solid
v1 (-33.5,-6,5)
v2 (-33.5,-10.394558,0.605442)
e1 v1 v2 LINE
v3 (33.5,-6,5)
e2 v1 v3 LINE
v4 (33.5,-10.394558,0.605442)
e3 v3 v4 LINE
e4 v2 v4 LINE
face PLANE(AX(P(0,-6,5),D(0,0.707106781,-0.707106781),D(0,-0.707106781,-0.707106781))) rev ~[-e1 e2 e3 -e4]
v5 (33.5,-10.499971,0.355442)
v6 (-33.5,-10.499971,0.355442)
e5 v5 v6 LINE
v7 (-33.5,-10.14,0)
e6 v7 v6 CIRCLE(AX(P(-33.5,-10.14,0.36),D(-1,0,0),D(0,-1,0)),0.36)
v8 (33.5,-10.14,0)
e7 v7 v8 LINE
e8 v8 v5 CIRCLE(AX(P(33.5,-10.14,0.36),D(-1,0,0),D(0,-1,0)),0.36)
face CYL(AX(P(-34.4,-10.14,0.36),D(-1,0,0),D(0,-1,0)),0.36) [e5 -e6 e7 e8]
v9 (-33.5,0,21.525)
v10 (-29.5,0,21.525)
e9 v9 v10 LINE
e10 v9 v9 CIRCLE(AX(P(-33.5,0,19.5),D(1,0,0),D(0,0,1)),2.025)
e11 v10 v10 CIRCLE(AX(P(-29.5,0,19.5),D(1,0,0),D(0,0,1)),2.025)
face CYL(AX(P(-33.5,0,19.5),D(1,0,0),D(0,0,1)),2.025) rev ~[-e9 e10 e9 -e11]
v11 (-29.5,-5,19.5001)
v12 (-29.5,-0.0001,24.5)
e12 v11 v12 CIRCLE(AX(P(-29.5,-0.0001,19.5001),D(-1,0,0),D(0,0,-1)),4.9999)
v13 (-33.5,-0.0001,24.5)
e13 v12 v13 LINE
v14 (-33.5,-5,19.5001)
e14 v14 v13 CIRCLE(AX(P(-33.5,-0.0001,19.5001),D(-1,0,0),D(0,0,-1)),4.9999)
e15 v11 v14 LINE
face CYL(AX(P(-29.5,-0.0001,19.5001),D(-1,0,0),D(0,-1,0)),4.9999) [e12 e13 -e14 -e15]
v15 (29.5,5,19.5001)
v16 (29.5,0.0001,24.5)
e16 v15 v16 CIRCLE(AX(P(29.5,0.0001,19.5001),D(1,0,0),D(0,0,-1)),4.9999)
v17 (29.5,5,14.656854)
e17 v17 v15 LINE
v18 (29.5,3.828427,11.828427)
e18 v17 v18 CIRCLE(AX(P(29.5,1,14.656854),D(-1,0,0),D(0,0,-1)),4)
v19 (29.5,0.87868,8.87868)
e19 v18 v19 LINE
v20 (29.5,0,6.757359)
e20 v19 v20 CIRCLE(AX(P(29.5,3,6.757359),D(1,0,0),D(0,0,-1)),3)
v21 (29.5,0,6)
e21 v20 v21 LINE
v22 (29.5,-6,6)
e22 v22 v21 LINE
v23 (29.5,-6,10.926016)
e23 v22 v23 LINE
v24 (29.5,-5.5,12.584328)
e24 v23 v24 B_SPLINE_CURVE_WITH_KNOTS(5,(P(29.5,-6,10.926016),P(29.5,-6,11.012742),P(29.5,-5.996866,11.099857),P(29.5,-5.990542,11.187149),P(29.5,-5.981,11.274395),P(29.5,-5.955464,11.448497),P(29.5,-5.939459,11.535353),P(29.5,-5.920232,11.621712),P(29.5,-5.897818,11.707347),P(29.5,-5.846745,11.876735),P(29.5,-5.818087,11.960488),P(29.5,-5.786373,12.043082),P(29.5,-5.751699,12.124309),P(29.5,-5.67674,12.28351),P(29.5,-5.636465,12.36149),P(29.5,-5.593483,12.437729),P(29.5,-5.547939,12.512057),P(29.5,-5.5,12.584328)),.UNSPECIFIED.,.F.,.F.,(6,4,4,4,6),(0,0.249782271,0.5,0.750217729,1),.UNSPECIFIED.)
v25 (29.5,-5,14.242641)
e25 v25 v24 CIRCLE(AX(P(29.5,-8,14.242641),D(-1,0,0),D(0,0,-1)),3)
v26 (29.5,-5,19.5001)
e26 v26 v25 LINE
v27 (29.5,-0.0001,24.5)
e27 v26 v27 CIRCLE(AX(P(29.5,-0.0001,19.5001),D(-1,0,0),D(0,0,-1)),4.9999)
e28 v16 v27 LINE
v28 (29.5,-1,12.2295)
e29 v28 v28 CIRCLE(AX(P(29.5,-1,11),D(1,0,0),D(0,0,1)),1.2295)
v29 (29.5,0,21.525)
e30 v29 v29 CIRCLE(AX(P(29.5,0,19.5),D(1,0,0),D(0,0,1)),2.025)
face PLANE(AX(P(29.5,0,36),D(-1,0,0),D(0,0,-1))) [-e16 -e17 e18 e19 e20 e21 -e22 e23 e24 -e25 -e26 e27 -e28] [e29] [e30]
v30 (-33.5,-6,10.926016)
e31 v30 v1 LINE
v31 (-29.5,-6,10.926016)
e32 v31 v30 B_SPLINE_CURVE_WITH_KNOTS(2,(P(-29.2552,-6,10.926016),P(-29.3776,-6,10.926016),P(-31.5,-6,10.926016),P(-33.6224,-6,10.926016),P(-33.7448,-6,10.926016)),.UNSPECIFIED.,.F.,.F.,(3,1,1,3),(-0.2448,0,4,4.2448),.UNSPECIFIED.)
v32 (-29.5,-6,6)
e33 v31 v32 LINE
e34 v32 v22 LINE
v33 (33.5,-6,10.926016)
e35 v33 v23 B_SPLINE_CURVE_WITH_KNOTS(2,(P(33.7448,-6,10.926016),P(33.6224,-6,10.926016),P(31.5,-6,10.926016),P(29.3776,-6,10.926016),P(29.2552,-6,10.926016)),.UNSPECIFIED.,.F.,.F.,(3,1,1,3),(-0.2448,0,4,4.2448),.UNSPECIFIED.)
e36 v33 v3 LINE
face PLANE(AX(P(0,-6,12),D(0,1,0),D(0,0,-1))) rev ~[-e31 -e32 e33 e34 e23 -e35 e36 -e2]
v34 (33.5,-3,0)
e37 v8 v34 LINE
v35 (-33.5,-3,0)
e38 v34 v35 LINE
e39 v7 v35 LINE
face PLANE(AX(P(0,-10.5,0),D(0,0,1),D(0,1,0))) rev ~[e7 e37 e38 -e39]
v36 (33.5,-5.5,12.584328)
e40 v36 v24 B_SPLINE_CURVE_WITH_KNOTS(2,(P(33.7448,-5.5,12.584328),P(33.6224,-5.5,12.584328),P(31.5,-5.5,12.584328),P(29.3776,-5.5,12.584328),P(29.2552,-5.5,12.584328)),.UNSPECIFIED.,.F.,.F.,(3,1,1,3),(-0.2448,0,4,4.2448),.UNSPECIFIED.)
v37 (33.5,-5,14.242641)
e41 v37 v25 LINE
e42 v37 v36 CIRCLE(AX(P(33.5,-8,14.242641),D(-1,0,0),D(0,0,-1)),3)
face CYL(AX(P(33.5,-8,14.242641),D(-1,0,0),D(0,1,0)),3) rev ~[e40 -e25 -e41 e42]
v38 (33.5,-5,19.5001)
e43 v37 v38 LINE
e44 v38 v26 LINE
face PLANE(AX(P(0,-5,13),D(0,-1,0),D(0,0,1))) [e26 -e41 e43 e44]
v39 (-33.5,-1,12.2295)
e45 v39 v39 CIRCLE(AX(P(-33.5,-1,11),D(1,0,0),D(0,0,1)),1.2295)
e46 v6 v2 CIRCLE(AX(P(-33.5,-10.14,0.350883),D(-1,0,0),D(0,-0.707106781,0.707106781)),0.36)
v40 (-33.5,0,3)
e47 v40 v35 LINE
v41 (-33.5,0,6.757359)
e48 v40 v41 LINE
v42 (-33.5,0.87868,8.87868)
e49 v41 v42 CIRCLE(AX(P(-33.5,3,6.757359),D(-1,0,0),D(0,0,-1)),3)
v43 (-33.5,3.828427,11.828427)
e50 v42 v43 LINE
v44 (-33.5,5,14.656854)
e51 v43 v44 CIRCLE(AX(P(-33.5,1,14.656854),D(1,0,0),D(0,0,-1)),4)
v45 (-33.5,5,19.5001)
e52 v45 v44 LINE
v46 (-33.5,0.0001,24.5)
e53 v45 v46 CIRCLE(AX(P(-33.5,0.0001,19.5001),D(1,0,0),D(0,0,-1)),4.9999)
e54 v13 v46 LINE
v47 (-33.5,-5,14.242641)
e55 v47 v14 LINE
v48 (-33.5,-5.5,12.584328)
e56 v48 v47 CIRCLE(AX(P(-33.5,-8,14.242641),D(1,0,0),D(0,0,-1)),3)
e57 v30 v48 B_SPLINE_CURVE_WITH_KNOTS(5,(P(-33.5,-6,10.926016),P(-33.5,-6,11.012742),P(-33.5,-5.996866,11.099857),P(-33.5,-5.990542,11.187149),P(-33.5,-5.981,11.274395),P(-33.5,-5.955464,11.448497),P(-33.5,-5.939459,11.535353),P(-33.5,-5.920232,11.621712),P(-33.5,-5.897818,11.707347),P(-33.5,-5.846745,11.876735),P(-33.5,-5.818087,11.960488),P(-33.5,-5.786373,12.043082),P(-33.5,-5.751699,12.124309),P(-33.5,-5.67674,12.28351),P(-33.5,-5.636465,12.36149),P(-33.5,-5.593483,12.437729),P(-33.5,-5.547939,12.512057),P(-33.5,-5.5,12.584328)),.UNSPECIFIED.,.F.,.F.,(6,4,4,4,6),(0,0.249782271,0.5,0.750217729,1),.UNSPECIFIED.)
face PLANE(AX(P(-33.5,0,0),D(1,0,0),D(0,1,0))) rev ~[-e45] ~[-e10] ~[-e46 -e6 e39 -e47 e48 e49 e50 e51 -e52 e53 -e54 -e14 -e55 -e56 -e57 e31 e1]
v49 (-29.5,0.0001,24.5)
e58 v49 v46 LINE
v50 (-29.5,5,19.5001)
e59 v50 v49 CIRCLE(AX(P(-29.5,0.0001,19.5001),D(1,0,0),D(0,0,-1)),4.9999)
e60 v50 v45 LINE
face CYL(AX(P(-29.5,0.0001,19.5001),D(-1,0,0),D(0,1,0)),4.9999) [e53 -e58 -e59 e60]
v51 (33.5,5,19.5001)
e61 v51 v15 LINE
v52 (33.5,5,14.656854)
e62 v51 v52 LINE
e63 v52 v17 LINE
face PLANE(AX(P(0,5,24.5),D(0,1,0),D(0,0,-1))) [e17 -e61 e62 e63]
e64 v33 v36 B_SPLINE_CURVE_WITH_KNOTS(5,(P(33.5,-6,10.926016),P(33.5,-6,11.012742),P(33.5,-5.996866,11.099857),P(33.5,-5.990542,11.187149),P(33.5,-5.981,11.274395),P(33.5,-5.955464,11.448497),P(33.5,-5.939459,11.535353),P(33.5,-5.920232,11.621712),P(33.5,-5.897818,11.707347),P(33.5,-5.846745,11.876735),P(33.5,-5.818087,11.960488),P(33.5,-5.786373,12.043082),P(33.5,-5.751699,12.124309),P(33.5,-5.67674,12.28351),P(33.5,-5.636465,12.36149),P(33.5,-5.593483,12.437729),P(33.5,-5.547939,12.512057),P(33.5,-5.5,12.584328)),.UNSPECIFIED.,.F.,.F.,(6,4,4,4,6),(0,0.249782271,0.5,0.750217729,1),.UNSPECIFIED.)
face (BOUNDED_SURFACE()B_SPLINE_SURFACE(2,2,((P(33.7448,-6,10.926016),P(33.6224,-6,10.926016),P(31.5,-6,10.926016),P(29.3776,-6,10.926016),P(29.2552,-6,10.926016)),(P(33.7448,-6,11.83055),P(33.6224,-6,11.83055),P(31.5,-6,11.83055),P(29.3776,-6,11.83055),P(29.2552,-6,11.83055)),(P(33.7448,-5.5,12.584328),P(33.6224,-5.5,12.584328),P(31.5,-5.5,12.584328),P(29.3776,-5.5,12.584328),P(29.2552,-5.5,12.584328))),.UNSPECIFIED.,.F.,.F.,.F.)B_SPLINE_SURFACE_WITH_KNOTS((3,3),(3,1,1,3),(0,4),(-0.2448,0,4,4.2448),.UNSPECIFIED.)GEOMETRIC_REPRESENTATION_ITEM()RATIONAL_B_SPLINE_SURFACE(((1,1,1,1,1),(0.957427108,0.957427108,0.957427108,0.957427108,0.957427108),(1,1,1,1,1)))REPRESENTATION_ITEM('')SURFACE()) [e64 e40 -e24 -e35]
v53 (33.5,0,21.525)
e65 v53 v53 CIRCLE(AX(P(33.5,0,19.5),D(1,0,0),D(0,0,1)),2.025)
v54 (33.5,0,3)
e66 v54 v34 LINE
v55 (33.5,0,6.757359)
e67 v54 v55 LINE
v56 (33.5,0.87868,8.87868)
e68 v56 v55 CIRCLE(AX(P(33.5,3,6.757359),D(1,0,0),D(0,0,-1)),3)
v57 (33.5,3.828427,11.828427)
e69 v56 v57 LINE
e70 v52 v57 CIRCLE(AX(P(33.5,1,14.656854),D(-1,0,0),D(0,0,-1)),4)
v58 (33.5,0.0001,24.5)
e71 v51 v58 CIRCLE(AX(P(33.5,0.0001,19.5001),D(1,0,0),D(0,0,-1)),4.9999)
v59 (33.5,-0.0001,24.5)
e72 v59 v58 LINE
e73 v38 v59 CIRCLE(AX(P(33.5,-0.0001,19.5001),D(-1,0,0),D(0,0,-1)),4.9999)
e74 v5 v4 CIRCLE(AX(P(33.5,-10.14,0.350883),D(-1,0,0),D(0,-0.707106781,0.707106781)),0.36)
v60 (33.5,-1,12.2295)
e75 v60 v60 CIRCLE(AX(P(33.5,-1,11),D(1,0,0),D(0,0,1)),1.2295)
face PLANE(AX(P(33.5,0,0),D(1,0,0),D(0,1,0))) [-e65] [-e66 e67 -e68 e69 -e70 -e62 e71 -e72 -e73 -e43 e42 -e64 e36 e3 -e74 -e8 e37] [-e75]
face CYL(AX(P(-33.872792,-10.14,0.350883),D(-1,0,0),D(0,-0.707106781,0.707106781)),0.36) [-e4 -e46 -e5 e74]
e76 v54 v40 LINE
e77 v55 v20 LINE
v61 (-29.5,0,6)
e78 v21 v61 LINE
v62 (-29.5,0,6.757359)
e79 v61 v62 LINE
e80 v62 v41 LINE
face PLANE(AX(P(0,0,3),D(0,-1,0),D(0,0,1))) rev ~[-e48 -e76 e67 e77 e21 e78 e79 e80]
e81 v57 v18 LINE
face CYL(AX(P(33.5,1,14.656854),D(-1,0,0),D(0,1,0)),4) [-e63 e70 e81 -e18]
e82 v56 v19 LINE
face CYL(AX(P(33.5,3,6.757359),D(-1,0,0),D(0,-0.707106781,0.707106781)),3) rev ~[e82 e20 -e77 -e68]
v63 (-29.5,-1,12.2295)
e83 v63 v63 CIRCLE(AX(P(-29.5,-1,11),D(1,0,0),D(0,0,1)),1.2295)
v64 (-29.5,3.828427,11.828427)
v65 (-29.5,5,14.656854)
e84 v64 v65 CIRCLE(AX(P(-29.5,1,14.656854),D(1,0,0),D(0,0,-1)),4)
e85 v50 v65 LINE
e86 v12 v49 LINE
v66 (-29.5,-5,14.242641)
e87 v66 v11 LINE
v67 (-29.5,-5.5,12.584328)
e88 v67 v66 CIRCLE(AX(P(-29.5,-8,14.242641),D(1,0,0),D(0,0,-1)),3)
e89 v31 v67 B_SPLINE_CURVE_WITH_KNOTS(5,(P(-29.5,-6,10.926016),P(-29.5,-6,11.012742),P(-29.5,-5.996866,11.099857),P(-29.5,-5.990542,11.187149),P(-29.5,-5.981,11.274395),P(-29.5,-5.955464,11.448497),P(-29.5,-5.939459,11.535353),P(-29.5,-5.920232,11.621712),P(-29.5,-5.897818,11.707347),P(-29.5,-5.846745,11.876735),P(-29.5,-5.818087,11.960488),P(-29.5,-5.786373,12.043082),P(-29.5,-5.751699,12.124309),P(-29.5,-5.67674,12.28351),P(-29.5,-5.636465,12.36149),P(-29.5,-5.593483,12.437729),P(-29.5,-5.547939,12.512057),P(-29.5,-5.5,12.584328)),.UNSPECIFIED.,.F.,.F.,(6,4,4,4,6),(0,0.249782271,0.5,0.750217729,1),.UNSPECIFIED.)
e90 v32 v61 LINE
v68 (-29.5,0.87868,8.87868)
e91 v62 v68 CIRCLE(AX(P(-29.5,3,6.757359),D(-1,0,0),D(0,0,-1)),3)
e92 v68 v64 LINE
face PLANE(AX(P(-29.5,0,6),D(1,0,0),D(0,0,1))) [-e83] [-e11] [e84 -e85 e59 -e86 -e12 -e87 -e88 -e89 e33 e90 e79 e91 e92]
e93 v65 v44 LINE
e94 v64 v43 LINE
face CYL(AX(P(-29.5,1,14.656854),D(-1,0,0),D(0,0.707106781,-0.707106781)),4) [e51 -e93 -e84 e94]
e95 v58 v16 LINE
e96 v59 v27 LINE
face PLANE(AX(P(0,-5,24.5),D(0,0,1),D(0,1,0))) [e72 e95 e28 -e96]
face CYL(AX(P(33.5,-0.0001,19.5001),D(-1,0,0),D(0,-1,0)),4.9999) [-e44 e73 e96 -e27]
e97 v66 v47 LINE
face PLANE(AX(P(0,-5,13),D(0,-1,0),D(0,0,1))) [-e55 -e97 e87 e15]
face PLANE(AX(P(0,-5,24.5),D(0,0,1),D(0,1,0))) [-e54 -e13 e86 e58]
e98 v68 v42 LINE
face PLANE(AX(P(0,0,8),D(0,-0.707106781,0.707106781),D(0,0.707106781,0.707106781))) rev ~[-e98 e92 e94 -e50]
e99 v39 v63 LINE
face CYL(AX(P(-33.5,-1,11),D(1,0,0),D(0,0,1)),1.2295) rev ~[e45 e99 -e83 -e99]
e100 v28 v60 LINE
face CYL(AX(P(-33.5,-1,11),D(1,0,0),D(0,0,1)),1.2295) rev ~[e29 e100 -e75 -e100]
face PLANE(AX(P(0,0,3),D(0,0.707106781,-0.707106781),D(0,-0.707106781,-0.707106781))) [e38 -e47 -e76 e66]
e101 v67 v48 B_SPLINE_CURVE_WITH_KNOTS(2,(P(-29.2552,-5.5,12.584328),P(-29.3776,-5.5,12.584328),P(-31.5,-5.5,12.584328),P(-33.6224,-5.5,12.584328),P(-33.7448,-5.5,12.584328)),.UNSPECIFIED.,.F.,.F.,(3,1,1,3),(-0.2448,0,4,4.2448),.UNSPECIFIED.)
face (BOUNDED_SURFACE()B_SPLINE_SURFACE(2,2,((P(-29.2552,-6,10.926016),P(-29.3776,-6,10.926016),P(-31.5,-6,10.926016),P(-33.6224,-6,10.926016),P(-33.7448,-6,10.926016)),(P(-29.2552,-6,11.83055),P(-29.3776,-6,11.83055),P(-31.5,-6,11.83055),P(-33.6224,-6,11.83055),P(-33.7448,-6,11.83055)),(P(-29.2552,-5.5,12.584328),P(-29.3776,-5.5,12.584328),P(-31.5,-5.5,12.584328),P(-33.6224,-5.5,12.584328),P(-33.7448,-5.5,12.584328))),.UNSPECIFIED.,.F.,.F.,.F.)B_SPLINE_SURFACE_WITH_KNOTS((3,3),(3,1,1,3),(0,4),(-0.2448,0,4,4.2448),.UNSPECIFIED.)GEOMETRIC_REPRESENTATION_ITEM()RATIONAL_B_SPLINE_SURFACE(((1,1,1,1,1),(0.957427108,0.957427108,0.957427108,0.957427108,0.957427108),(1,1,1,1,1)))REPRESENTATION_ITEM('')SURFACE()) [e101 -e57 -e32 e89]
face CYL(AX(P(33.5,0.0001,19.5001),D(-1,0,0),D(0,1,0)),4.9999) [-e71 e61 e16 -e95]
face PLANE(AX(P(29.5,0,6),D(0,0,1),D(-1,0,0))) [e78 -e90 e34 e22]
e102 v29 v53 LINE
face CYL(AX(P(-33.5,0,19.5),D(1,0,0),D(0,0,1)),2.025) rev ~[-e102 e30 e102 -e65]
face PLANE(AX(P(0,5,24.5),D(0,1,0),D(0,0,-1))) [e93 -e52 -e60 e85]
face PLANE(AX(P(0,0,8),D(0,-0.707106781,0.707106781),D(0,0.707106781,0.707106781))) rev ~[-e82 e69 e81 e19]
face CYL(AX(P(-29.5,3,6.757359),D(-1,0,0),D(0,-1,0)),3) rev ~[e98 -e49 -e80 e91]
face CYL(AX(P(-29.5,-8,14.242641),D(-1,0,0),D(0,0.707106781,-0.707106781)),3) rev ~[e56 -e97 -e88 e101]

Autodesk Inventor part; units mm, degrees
ref_plane "YZ Plane" through (0, 0, 0) normal (1, 0, 0) x (0, 1, 0)
ref_plane "XZ Plane" through (0, 0, 0) normal (0, 1, 0) x (-1, 0, 0)
ref_plane "XY Plane" through (0, 0, 0) normal (0, 0, 1) x (1, 0, 0)
sketch "Skizze1" plane through (0, 0, 0) normal (1, 0, 0) x (0, 1, 0)
  line L0 (-6, 5) -> (-10.5, 0.5)
  line L1 (-10.5, 0) -> (-3, 0)
  line L2 (0, 3) -> (0, 8)
  line L3 (-10.5, 0.5) -> (-10.5, 0)
  line L4 (0, 8) -> (5, 13)
  line L5 (0, 8) -> (0, 19.5) construction
  circle A0 centre (0, 19.5) radius 0.5
  line L6 (-5, 13) -> (-5, 24.5)
  line L7 (-5, 24.5) -> (5, 24.5)
  line L8 (5, 24.5) -> (5, 13)
  line L9 (0, 3) -> (-3, 0)
  line L10 (-5, 13) -> (-6, 12)
  line L11 (-6, 12) -> (-6, 5)
  line L12 (5, 13) -> (-5, 13) construction
  point P0 (0, 0)
  dimension "d40" = 0.5
  dimension "d41" = 10.5
  dimension "d44" = 1
  dimension "d56" = 5
  dimension "d58" = 19.5
  dimension "d59" = 10
  dimension "d60" = 45
  dimension "d61" = 8
  dimension "d62" = 3
  dimension "d63" = 45
  dimension "d67" = 1
extrude "Extrusion1" add sketch "Skizze1" along normal mid plane 67
sketch "Skizze6" plane through (0, 0, 0) normal (0, 1, 0) x (-1, 0, 0)
  line L0 (33.5, 0.5) -> (-33.5, 0.5) projected
  line L1 (-33.5, 5) -> (-33.5, 0.5) projected
  line L2 (33.5, 0.5) -> (33.5, 5) projected
  line L3 (-29.5, 6) -> (29.5, 6)
  line L4 (29.5, 6) -> (29.5, 36)
  line L5 (29.5, 36) -> (-29.5, 36)
  line L6 (-29.5, 36) -> (-29.5, 6)
  line L7 (0, -7.1) -> (0, 42.6) projected
  line L8 (33.5, 0) -> (-33.5, 0) projected
  line L9 (-33.5, 0) -> (33.5, 0) projected
  point P0 (0, 0)
  point P1 (-33, 10)
  point P2 (33, 10)
  dimension "d45" = 4
  dimension "d46" = 30
  dimension "d50" = 6
extrude "Extrusion4" cut sketch "Skizze6" along normal through all both and the other way through all
sketch "Skizze3" plane through (-33.5, 0, 0) normal (-1, 0, 0) x (0, 0, 1)
  line L0 (8, 0) -> (3, 0) projected
  line L1 (0, -3) -> (0, -10.5) projected
  line L2 (0.5, -10.5) -> (5, -6) projected
  line L3 (0, -10.5) -> (0, 0) construction
  line L4 (0, 8.1) -> (0, -13.6) projected
  line L5 (0, -10.5) -> (0.5, -10.5) projected
  line L6 (13, 5) -> (8, 0) projected
  line L7 (13, -5) -> (24.5, -5) projected
  line L8 (24.5, -5) -> (24.5, 5) projected
  line L9 (24.5, 5) -> (13, 5) projected
  circle A0 centre (19.5, 0) radius 0.5 projected
  line L10 (3, 0) -> (0, -3) projected
  line L11 (5, -6) -> (12, -6) projected
  line L12 (12, -6) -> (13, -5) projected
hole "Bohrung1" at (-33.5, 0, 19.5) direction (1, 0, 0) diameter 4.05 end through all
sketch "Skizze4" plane through (-33.5, 0, 0) normal (-1, 0, 0) x (0, 0, 1)
  line L0 (8, 0) -> (0, 0) projected
  line L1 (0, 8.1) -> (0, -13.6) projected
  point P0 (29, 0)
  point P1 (11, -1)
  dimension "d38" = 11
  dimension "d69" = 1
hole "Bohrung2" at (-33.5, -1, 11) direction (1, 0, 0) diameter 2.459 end through all thread size "M3x0.5" class "6H" standard "ISO Metric profile"
fillet "Rundung1" [suppressed]
fillet "Rundung2" radius 5 4 edges at (31.5, -5, 24.5) (31.5, 5, 24.5) (-31.5, 5, 24.5) (-31.5, -5, 24.5)
fillet "Rundung5" radius 4 2 edges at (31.5, 5, 13) (-31.5, 5, 13)
fillet "Rundung7" radius 3 6 edges at (-31.5, 0, 8) (31.5, 0, 8) (31.5, -6, 12) (31.5, -5, 13) (-31.5, -6, 12) (-31.5, -5, 13)
fillet "Rundung8" radius 0.36 2 edges at (0, -10.5, 0.5) (0, -10.5, 0)
properties part number "Chip Schaufel" material "Aluminium 6061"
